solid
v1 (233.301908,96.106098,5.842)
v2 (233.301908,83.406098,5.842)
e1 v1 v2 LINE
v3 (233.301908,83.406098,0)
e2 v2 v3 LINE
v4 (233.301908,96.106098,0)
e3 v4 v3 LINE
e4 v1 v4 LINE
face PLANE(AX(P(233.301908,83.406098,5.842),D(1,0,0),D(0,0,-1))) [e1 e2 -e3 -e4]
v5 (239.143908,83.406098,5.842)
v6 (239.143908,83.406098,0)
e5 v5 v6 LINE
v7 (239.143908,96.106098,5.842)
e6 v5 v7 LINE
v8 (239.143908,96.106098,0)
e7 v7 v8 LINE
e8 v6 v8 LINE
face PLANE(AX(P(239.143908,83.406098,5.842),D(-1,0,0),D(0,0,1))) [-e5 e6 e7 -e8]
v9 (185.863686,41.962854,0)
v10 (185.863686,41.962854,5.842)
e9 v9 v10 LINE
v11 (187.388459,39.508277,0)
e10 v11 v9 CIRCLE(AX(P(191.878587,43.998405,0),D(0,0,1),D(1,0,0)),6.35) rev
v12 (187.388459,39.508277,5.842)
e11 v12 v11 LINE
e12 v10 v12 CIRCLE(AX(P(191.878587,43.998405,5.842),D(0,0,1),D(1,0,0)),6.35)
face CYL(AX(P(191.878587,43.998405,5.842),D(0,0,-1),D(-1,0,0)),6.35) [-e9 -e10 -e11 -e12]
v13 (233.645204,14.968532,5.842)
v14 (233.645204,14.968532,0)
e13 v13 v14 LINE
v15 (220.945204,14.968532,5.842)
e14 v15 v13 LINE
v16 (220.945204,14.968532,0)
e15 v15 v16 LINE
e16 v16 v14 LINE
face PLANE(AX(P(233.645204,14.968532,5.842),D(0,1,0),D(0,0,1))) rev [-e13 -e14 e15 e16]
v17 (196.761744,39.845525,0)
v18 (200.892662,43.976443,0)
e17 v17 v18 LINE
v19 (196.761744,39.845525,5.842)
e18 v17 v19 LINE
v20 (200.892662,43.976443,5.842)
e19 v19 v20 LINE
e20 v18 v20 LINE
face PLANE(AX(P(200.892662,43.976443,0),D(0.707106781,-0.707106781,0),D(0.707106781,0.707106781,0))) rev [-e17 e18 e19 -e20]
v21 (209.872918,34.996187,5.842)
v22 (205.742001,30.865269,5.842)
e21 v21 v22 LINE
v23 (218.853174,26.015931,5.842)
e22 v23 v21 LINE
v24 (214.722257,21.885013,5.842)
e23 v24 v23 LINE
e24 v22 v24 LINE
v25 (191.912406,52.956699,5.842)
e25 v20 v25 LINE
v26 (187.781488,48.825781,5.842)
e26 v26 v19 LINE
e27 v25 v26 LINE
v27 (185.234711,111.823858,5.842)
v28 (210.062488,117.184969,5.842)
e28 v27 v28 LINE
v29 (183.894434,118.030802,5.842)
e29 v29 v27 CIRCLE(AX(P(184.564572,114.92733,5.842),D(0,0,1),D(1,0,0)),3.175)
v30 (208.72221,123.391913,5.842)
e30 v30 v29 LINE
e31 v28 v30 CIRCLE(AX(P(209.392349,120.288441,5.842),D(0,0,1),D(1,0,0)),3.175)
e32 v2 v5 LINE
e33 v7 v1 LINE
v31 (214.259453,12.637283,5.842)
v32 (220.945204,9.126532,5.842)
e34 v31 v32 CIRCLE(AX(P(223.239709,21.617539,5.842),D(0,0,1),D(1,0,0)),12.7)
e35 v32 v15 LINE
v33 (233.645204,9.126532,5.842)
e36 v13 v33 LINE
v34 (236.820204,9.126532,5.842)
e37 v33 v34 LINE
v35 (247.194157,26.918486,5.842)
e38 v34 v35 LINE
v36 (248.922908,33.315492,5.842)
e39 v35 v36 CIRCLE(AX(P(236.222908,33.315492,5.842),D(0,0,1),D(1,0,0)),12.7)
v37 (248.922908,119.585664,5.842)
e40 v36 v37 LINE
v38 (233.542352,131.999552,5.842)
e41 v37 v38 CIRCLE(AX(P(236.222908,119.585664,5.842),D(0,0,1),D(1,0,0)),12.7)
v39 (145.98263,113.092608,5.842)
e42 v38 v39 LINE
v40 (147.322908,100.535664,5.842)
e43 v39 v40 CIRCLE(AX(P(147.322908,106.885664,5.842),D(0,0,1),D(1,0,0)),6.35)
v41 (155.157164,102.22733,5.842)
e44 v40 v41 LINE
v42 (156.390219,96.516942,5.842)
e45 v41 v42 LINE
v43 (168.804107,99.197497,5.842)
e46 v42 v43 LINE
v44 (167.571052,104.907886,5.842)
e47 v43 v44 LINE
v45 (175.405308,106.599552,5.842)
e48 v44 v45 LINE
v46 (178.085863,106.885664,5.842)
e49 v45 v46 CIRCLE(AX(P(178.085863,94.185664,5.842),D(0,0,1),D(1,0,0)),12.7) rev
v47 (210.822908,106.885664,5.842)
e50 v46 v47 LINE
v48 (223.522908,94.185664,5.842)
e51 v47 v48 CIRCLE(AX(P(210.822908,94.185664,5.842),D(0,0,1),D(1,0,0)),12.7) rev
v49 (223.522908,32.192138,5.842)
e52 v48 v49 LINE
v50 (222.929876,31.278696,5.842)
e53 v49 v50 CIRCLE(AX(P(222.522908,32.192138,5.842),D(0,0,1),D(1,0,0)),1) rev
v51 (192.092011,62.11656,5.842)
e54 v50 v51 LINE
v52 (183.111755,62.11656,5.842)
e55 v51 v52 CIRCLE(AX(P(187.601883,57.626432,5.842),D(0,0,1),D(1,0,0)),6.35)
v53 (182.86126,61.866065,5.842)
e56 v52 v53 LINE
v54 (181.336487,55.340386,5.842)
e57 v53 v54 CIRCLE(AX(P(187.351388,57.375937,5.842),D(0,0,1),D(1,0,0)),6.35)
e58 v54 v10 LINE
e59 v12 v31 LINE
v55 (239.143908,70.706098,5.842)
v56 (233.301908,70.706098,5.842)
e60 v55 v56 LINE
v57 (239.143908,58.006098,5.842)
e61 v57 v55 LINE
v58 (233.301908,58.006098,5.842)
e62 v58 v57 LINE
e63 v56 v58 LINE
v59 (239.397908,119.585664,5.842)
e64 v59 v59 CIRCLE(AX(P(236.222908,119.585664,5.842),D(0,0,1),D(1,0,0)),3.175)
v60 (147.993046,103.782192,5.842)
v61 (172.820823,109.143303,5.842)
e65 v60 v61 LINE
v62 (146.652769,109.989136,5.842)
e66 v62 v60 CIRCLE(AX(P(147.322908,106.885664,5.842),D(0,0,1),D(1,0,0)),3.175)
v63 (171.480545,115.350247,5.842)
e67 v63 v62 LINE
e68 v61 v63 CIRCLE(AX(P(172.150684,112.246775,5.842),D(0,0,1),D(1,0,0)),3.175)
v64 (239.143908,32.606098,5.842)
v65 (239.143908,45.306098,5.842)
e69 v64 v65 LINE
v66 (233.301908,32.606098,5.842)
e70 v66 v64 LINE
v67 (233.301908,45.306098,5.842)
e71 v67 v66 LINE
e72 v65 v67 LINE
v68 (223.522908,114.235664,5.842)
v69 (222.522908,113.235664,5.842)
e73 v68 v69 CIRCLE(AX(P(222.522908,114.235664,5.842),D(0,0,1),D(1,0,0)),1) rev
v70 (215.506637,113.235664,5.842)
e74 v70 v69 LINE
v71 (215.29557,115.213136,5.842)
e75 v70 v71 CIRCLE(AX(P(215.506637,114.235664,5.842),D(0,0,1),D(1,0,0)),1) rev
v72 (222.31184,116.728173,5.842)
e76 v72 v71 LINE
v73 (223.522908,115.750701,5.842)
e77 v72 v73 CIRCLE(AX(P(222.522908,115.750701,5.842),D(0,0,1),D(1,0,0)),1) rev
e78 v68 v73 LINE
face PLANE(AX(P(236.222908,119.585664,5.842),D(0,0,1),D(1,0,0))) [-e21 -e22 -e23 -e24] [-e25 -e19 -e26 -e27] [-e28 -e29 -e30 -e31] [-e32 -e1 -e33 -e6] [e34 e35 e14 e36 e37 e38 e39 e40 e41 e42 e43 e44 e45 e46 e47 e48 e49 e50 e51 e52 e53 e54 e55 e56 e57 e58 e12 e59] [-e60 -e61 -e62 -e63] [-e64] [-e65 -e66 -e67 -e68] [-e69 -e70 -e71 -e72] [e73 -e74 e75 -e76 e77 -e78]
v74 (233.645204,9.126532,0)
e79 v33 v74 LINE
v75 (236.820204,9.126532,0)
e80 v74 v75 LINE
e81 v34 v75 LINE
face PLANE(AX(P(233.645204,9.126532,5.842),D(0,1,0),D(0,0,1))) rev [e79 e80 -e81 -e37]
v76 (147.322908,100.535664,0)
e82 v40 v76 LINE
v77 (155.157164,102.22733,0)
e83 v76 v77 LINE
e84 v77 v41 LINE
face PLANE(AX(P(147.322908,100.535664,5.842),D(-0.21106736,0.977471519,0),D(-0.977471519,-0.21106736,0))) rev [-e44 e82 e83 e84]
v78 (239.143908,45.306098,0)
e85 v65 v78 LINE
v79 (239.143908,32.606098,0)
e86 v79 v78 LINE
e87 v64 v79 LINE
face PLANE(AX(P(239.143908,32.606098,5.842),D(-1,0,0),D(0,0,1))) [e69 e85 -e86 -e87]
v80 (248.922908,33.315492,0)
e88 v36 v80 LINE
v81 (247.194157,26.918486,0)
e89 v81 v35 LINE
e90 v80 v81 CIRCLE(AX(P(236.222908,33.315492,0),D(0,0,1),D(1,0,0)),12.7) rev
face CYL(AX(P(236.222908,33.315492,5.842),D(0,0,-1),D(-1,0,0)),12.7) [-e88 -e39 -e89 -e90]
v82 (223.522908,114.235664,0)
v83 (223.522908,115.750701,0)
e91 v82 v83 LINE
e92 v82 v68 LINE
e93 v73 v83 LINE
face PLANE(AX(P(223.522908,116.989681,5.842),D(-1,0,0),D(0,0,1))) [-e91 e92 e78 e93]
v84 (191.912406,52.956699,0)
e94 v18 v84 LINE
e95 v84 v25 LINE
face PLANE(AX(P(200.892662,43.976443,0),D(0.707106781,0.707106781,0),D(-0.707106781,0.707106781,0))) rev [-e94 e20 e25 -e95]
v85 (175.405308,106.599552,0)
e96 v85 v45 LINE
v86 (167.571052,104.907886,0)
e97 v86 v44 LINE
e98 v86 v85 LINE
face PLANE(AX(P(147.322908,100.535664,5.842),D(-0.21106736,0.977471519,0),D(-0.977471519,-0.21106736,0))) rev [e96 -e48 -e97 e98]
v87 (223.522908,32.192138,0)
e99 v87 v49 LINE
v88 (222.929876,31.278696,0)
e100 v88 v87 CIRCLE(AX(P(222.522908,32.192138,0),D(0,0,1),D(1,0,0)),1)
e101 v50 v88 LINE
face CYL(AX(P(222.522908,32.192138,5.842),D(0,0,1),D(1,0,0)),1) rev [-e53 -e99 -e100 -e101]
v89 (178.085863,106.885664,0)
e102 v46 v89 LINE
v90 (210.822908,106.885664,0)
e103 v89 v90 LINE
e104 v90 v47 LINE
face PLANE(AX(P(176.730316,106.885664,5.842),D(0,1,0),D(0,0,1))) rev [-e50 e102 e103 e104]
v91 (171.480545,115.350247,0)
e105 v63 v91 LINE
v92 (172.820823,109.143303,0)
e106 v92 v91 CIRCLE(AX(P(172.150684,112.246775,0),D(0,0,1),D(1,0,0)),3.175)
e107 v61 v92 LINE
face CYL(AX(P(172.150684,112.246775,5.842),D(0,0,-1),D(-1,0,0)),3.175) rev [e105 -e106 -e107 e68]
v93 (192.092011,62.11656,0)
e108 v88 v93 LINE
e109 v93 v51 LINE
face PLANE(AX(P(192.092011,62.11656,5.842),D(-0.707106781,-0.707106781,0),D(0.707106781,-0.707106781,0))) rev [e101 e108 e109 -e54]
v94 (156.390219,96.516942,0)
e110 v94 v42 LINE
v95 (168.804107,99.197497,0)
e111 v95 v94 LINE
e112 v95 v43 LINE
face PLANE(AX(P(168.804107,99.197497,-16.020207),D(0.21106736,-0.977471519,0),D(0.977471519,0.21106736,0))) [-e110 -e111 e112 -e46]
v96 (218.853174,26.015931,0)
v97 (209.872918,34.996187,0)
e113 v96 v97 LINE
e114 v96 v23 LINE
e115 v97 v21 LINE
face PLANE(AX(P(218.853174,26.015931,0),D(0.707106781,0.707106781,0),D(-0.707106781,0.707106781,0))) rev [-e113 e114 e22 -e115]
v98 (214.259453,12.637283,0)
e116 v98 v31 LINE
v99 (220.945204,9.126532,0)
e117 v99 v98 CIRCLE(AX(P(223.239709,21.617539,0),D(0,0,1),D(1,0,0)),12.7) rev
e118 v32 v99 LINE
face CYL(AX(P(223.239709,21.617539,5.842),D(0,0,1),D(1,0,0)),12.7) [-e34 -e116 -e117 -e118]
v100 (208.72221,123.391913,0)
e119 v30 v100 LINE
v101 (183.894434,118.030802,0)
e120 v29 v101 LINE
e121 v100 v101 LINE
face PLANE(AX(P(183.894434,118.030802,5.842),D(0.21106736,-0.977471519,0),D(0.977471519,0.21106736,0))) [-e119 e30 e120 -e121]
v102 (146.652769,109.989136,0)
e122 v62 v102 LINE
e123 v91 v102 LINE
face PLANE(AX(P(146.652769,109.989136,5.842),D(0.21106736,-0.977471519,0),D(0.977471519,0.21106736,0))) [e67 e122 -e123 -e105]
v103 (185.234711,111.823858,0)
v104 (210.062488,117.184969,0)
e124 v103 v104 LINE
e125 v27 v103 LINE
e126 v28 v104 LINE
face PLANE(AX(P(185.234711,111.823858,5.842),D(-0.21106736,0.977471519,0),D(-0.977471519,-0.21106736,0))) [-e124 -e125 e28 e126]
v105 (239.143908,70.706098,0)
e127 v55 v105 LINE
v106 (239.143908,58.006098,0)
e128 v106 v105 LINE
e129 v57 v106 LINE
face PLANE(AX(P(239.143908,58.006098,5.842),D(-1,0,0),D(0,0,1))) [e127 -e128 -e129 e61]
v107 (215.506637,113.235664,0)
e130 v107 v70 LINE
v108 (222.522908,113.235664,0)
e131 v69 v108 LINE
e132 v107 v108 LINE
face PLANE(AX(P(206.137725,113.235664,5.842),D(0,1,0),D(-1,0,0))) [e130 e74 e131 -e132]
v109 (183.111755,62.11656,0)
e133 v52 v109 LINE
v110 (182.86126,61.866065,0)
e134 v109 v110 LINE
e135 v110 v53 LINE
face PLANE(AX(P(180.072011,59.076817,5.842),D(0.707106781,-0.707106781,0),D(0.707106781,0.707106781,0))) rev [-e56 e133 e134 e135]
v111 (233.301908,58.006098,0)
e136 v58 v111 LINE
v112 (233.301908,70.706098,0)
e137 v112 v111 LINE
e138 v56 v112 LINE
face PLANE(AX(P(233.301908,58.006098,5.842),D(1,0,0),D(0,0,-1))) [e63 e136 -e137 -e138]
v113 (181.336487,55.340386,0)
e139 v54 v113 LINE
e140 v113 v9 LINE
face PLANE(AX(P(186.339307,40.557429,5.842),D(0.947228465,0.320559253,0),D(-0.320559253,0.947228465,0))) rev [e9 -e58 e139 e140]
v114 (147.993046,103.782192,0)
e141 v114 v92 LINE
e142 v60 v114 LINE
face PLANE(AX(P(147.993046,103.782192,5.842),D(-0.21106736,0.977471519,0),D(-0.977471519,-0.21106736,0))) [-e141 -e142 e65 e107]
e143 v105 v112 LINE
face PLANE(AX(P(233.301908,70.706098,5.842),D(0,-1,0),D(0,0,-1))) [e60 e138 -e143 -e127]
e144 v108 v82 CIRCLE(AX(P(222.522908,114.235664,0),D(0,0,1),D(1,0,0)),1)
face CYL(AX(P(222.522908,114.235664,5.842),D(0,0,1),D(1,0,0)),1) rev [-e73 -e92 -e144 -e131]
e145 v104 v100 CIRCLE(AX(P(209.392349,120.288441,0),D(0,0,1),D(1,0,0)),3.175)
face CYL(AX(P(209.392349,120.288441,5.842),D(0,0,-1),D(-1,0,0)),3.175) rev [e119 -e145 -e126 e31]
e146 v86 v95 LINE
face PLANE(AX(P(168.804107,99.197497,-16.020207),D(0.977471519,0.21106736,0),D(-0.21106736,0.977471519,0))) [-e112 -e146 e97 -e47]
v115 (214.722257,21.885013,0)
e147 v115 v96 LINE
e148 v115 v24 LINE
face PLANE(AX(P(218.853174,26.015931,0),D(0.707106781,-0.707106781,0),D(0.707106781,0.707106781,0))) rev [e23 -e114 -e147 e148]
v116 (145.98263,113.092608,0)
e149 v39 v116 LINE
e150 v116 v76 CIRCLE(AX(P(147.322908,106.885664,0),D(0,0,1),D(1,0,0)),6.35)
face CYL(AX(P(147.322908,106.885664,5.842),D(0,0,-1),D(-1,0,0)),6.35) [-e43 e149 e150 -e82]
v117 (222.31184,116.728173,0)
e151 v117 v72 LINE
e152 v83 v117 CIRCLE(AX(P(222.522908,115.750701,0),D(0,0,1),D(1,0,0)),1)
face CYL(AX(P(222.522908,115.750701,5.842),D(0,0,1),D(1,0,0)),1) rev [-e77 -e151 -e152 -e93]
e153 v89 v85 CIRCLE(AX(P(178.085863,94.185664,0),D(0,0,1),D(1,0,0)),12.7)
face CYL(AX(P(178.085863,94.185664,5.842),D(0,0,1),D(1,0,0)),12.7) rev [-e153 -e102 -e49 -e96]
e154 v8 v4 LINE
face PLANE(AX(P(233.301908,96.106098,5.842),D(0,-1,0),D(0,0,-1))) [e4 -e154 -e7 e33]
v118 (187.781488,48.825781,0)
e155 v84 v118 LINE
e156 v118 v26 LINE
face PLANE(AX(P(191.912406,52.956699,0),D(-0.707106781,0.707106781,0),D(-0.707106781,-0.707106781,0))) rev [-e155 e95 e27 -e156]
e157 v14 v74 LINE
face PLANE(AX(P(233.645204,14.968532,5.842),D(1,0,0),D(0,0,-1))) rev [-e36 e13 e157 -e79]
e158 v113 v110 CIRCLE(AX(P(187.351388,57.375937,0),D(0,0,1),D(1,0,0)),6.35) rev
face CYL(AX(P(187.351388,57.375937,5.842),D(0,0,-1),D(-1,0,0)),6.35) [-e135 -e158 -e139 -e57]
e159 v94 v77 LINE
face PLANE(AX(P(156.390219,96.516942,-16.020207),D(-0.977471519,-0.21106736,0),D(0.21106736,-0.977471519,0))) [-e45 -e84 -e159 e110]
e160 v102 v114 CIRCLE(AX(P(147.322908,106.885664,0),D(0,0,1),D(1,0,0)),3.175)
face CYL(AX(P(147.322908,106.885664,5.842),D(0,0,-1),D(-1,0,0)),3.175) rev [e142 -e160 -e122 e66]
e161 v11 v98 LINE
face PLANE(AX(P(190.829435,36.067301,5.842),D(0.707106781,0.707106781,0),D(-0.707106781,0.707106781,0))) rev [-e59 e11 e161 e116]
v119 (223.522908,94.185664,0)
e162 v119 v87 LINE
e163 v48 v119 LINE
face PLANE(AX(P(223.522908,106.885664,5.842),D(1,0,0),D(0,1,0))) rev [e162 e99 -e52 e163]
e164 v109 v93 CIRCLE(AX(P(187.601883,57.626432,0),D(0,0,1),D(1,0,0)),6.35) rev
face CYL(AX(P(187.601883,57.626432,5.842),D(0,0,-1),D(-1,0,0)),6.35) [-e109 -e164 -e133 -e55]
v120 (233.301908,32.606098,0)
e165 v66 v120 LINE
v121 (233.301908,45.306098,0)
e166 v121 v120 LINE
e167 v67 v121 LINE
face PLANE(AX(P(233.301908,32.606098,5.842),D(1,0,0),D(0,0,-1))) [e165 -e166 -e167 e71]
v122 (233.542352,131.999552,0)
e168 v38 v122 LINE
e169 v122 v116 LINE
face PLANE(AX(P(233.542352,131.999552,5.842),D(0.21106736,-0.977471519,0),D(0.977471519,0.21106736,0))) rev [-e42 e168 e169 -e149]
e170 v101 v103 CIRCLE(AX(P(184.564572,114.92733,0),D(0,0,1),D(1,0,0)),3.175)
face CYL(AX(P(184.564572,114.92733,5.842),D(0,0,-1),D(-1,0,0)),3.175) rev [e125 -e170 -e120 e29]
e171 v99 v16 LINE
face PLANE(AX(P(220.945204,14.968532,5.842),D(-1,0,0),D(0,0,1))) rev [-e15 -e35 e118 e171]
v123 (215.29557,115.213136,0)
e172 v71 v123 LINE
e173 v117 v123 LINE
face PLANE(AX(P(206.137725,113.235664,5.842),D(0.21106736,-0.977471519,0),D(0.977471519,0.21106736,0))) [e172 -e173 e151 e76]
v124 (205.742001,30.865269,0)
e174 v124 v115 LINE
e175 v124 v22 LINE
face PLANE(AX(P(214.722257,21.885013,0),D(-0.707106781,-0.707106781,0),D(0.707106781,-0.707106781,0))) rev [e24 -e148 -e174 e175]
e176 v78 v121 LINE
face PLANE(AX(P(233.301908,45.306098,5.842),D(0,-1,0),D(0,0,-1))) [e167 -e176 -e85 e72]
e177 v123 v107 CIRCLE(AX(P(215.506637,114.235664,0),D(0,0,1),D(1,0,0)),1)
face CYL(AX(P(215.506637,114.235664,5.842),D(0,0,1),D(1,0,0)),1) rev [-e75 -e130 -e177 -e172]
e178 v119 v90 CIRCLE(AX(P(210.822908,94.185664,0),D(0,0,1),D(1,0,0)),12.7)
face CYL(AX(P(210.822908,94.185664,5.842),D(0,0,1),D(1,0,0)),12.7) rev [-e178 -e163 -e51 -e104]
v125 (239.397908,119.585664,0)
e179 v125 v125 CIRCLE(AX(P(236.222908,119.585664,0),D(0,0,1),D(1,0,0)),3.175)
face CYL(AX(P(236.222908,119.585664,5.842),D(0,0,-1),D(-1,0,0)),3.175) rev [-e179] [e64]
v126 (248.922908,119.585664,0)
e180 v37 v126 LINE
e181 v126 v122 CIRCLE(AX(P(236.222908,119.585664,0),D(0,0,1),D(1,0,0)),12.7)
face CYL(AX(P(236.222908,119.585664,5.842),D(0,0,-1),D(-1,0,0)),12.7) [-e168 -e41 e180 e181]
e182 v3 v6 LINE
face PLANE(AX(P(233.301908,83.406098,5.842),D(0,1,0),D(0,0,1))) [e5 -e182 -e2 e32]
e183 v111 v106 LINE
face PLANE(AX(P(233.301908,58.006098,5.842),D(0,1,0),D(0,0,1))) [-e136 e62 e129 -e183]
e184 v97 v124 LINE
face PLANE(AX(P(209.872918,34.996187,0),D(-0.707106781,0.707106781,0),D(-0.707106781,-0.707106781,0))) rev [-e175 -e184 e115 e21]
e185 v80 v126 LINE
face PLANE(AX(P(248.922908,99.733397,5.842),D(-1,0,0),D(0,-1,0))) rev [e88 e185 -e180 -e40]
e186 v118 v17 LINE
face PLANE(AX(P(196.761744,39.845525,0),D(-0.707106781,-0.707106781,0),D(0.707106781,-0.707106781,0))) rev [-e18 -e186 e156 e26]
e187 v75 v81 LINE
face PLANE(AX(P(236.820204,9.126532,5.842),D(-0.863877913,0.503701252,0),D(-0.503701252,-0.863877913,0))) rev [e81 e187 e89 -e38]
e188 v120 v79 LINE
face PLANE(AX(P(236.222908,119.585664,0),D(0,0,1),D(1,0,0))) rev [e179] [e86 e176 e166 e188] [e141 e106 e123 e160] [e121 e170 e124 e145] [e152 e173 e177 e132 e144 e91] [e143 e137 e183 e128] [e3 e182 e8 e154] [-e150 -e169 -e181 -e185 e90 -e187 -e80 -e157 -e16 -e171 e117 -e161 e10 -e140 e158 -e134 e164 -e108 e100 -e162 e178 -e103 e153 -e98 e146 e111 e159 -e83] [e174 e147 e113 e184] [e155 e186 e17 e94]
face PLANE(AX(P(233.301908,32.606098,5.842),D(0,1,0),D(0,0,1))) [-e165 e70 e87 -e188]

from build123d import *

# Parameters (mm, degrees)
SKETCH1_R           = 3.175
SKETCH1_W           = 5.842
SKETCH1_H           = 12.7
BOSS_EXTRUDE1_DEPTH = 5.842
FILLET3_R           = 12.7
FILLET4_R           = 1
FILLET5_R           = 1
BOSS_EXTRUDE2_DEPTH = 5.842
CUT_EXTRUDE1_DEPTH  = 282.950775489
FILLET6_R           = 6.35
BOSS_EXTRUDE3_DEPTH = 5.842


with BuildPart() as part:
    # Sketch1 → Boss-Extrude1 (new body)
    with BuildSketch(Plane.XY):
        with BuildLine():
            Line((217.770203729, 9.126532246), (220.945203729, 9.126532246))
            Line((220.945203729, 9.126532246), (220.945203729, 14.968532246))
            Line((220.945203729, 14.968532246), (233.645203729, 14.968532246))
            Line((233.645203729, 14.968532246), (233.645203729, 9.126532246))
            Line((233.645203729, 9.126532246), (236.820203729, 9.126532246))
            Line((236.820203729, 9.126532246), (248.922907622, 29.883396652))
            Line((248.922907622, 29.883396652), (248.922907622, 36.233396652))
            Line((248.922907622, 36.233396652), (248.922907622, 99.733396652))
            Line((248.922907622, 99.733396652), (248.922907622, 119.585663985))
            ThreePointArc((248.922907622, 119.585663985), (244.199339956, 129.46830165), (233.542352153, 131.99955227))
            Line((233.542352153, 131.99955227), (145.982629888, 113.092608128))
            ThreePointArc((145.982629888, 113.092608128), (141.008772871, 106.211718626), (147.322907622, 100.535663985))
            Line((147.322907622, 100.535663985), (176.730316466, 106.885663985))
            Line((176.730316466, 106.885663985), (223.522907622, 106.885663985))
            Line((223.522907622, 106.885663985), (223.522907622, 30.685663985))
            Line((223.522907622, 30.685663985), (222.929875834, 31.278695773))
            Line((222.929875834, 31.278695773), (218.798958018, 27.147777957))
            Line((218.798958018, 27.147777957), (209.818701897, 36.128034078))
            Line((209.818701897, 36.128034078), (213.949619713, 40.258951894))
            Line((213.949619713, 40.258951894), (204.969363592, 49.239208015))
            Line((204.969363592, 49.239208015), (200.838445776, 45.108290199))
            Line((200.838445776, 45.108290199), (187.961093383, 57.985642593))
            Line((187.961093383, 57.985642593), (192.092011199, 62.116560408))
            Line((192.092011199, 62.116560408), (187.601883138, 66.606688469))
            Line((187.601883138, 66.606688469), (180.072011297, 59.076816628))
            Line((180.072011297, 59.076816628), (186.339307306, 40.55742867))
            Line((186.339307306, 40.55742867), (190.829435366, 36.067300609))
            Line((190.829435366, 36.067300609), (217.770203729, 9.126532246))
        make_face()
        with Locations((236.222907622, 119.585663985)):
            Circle(SKETCH1_R, mode=Mode.SUBTRACT)
        Polygon((223.522907622, 116.989680814), (223.522907622, 113.235663985), (206.137725309, 113.235663985), align=None, mode=Mode.SUBTRACT)
        with BuildLine():
            Line((146.652768755, 109.989136056), (171.480545327, 115.350246995))
            ThreePointArc((171.480545327, 115.350246995), (175.254156266, 112.916913791), (172.820823062, 109.143302852))
            Line((172.820823062, 109.143302852), (147.99304649, 103.782191913))
            ThreePointArc((147.99304649, 103.782191913), (144.219435551, 106.215525117), (146.652768755, 109.989136056))
        make_face(mode=Mode.SUBTRACT)
        with BuildLine():
            Line((183.894433613, 118.030802464), (208.722210185, 123.391913403))
            ThreePointArc((208.722210185, 123.391913403), (212.495821124, 120.958580199), (210.062487919, 117.18496926))
            Line((210.062487919, 117.18496926), (185.234711348, 111.823858321))
            ThreePointArc((185.234711348, 111.823858321), (181.461100409, 114.257191525), (183.894433613, 118.030802464))
        make_face(mode=Mode.SUBTRACT)
        with Locations((236.222907622, 38.956098115)):
            Rectangle(SKETCH1_W, SKETCH1_H, mode=Mode.SUBTRACT)
        with Locations((236.222907622, 64.356098115)):
            Rectangle(SKETCH1_W, SKETCH1_H, mode=Mode.SUBTRACT)
        with Locations((236.222907622, 89.756098115)):
            Rectangle(SKETCH1_W, SKETCH1_H, mode=Mode.SUBTRACT)
    extrude(amount=BOSS_EXTRUDE1_DEPTH)

    # Fillet3
    # the kernel refuses this fillet: 12.7 mm, written as the material it adds along each edge
    with BuildSketch(Plane(origin=(223.522907622, 106.885663985, 0), x_dir=(0, -1, 0), z_dir=(0, 0, 1))) as fillet3_piece_1:
        with BuildLine():
            CenterArc((FILLET3_R, -FILLET3_R), FILLET3_R, 90, 90)
            Line((0, -FILLET3_R), (0, 0))
            Line((0, 0), (FILLET3_R, 0))
        make_face()
    extrude(amount=5.842)
    with BuildSketch(Plane(origin=(176.730316466, 106.885663985, 0), x_dir=(1, 0, 0), z_dir=(0, 0, 1))) as fillet3_piece_2:
        with BuildLine():
            CenterArc((FILLET3_R * 0.106735979666, -FILLET3_R), FILLET3_R, 90, 12.184909582)
            Line((-FILLET3_R * 0.104331380131, -FILLET3_R * 0.0225284814234), (0, 0))
            Line((0, 0), (FILLET3_R * 0.106735979666, 0))
        make_face()
    extrude(amount=5.842)
    # the kernel refuses this fillet: 12.7 mm, written as the material it takes off along each edge
    with BuildSketch(Plane(origin=(248.922907622, 29.883396652, -8.580237273), x_dir=(-0.50370125175659, -0.8638779132370756, 0), z_dir=(0, 0, 1))) as fillet3_2_piece_1:
        with BuildLine():
            CenterArc((FILLET3_R * 0.270243693634, -FILLET3_R), FILLET3_R, 90, 30.245176455)
            Line((-FILLET3_R * 0.233457558122, -FILLET3_R * 0.136122086763), (0, 0))
            Line((0, 0), (FILLET3_R * 0.270243693634, 0))
        make_face()
    extrude(amount=23.002474546, mode=Mode.SUBTRACT)
    with BuildSketch(Plane(origin=(217.770203729, 9.126532246, -12.412377003), x_dir=(1, 0, 0), z_dir=(0, 0, 1))) as fillet3_2_piece_2:
        with BuildLine():
            CenterArc((5.469505741, 12.491006501), FILLET3_R, 225, 34.591227114)
            Line((-3.51075038, 3.51075038), (0, 0))
            Line((0, 0), (3.175, 0))
        make_face()
    extrude(amount=30.666754006, mode=Mode.SUBTRACT)

    # Fillet4
    fillet4_edges = [part.edges().sort_by_distance(p)[0] for p in [
        (223.522907622, 116.989680814, 2.921),
        (206.137725309, 113.235663985, 2.921),
        (223.522907622, 113.235663985, 2.921),
    ]]
    fillet(fillet4_edges, radius=FILLET4_R)

    # Fillet5
    # the kernel refuses this fillet: 1 mm, written as the material it adds along each edge
    with BuildSketch(Plane(origin=(223.522907622, 30.685663985, 0), x_dir=(0, 1, 0), z_dir=(0, 0, 1))) as fillet5_piece_1:
        with BuildLine():
            CenterArc((1.50647411, 1), FILLET5_R, 204.01452435, 65.98547565)
            Line((0.593031788, 0.593031788), (0.574762942, 0.584892424))
            ThreePointArc((0.574762942, 0.584892424), (0.282373759, 0.31065803), (-0.014142136, 0.014142136))
            Line((-0.014142136, 0.014142136), (0, -0.02))
            Line((0, -0.02), (1.50647411, -0.02))
            Line((1.50647411, -0.02), (1.50647411, 0))
        make_face()
    extrude(amount=5.842)

    # Sketch4 → Boss-Extrude2 (add)
    with BuildSketch(Plane.XY.offset(5.842)):
        Polygon((192.092011199, 62.116560408), (222.590849502, 31.617722105), (222.929875834, 31.278695773), (218.798958018, 27.147777957), (187.961093383, 57.985642593), align=None)
    extrude(amount=-BOSS_EXTRUDE2_DEPTH)

    # Sketch5 → Cut-Extrude1 (cut, through all)
    with BuildSketch(Plane.XY.offset(5.842)):
        Polygon((191.912406076, 52.956699165), (187.781488261, 48.825781349), (196.761744382, 39.845525228), (200.892662197, 43.976443044), align=None)
        Polygon((209.872918318, 34.996186923), (205.742000503, 30.865269107), (214.722256624, 21.885012986), (218.85317444, 26.015930802), align=None)
    extrude(amount=-CUT_EXTRUDE1_DEPTH, mode=Mode.SUBTRACT)

    # Fillet6
    fillet6_edges = [part.edges().sort_by_distance(p)[0] for p in [
        (186.339307306, 40.55742867, 2.921),
        (180.072011297, 59.076816628, 2.921),
        (187.601883138, 66.606688469, 2.921),
    ]]
    fillet(fillet6_edges, radius=FILLET6_R)

    # Sketch6 → Boss-Extrude3 (add)
    with BuildSketch(Plane.XY.offset(5.842)):
        Polygon((168.804107439, 99.197497251), (156.390219153, 96.516941781), (155.157163637, 102.227330393), (167.571051923, 104.907885862), align=None)
    extrude(amount=-BOSS_EXTRUDE3_DEPTH)


solid = part.part
